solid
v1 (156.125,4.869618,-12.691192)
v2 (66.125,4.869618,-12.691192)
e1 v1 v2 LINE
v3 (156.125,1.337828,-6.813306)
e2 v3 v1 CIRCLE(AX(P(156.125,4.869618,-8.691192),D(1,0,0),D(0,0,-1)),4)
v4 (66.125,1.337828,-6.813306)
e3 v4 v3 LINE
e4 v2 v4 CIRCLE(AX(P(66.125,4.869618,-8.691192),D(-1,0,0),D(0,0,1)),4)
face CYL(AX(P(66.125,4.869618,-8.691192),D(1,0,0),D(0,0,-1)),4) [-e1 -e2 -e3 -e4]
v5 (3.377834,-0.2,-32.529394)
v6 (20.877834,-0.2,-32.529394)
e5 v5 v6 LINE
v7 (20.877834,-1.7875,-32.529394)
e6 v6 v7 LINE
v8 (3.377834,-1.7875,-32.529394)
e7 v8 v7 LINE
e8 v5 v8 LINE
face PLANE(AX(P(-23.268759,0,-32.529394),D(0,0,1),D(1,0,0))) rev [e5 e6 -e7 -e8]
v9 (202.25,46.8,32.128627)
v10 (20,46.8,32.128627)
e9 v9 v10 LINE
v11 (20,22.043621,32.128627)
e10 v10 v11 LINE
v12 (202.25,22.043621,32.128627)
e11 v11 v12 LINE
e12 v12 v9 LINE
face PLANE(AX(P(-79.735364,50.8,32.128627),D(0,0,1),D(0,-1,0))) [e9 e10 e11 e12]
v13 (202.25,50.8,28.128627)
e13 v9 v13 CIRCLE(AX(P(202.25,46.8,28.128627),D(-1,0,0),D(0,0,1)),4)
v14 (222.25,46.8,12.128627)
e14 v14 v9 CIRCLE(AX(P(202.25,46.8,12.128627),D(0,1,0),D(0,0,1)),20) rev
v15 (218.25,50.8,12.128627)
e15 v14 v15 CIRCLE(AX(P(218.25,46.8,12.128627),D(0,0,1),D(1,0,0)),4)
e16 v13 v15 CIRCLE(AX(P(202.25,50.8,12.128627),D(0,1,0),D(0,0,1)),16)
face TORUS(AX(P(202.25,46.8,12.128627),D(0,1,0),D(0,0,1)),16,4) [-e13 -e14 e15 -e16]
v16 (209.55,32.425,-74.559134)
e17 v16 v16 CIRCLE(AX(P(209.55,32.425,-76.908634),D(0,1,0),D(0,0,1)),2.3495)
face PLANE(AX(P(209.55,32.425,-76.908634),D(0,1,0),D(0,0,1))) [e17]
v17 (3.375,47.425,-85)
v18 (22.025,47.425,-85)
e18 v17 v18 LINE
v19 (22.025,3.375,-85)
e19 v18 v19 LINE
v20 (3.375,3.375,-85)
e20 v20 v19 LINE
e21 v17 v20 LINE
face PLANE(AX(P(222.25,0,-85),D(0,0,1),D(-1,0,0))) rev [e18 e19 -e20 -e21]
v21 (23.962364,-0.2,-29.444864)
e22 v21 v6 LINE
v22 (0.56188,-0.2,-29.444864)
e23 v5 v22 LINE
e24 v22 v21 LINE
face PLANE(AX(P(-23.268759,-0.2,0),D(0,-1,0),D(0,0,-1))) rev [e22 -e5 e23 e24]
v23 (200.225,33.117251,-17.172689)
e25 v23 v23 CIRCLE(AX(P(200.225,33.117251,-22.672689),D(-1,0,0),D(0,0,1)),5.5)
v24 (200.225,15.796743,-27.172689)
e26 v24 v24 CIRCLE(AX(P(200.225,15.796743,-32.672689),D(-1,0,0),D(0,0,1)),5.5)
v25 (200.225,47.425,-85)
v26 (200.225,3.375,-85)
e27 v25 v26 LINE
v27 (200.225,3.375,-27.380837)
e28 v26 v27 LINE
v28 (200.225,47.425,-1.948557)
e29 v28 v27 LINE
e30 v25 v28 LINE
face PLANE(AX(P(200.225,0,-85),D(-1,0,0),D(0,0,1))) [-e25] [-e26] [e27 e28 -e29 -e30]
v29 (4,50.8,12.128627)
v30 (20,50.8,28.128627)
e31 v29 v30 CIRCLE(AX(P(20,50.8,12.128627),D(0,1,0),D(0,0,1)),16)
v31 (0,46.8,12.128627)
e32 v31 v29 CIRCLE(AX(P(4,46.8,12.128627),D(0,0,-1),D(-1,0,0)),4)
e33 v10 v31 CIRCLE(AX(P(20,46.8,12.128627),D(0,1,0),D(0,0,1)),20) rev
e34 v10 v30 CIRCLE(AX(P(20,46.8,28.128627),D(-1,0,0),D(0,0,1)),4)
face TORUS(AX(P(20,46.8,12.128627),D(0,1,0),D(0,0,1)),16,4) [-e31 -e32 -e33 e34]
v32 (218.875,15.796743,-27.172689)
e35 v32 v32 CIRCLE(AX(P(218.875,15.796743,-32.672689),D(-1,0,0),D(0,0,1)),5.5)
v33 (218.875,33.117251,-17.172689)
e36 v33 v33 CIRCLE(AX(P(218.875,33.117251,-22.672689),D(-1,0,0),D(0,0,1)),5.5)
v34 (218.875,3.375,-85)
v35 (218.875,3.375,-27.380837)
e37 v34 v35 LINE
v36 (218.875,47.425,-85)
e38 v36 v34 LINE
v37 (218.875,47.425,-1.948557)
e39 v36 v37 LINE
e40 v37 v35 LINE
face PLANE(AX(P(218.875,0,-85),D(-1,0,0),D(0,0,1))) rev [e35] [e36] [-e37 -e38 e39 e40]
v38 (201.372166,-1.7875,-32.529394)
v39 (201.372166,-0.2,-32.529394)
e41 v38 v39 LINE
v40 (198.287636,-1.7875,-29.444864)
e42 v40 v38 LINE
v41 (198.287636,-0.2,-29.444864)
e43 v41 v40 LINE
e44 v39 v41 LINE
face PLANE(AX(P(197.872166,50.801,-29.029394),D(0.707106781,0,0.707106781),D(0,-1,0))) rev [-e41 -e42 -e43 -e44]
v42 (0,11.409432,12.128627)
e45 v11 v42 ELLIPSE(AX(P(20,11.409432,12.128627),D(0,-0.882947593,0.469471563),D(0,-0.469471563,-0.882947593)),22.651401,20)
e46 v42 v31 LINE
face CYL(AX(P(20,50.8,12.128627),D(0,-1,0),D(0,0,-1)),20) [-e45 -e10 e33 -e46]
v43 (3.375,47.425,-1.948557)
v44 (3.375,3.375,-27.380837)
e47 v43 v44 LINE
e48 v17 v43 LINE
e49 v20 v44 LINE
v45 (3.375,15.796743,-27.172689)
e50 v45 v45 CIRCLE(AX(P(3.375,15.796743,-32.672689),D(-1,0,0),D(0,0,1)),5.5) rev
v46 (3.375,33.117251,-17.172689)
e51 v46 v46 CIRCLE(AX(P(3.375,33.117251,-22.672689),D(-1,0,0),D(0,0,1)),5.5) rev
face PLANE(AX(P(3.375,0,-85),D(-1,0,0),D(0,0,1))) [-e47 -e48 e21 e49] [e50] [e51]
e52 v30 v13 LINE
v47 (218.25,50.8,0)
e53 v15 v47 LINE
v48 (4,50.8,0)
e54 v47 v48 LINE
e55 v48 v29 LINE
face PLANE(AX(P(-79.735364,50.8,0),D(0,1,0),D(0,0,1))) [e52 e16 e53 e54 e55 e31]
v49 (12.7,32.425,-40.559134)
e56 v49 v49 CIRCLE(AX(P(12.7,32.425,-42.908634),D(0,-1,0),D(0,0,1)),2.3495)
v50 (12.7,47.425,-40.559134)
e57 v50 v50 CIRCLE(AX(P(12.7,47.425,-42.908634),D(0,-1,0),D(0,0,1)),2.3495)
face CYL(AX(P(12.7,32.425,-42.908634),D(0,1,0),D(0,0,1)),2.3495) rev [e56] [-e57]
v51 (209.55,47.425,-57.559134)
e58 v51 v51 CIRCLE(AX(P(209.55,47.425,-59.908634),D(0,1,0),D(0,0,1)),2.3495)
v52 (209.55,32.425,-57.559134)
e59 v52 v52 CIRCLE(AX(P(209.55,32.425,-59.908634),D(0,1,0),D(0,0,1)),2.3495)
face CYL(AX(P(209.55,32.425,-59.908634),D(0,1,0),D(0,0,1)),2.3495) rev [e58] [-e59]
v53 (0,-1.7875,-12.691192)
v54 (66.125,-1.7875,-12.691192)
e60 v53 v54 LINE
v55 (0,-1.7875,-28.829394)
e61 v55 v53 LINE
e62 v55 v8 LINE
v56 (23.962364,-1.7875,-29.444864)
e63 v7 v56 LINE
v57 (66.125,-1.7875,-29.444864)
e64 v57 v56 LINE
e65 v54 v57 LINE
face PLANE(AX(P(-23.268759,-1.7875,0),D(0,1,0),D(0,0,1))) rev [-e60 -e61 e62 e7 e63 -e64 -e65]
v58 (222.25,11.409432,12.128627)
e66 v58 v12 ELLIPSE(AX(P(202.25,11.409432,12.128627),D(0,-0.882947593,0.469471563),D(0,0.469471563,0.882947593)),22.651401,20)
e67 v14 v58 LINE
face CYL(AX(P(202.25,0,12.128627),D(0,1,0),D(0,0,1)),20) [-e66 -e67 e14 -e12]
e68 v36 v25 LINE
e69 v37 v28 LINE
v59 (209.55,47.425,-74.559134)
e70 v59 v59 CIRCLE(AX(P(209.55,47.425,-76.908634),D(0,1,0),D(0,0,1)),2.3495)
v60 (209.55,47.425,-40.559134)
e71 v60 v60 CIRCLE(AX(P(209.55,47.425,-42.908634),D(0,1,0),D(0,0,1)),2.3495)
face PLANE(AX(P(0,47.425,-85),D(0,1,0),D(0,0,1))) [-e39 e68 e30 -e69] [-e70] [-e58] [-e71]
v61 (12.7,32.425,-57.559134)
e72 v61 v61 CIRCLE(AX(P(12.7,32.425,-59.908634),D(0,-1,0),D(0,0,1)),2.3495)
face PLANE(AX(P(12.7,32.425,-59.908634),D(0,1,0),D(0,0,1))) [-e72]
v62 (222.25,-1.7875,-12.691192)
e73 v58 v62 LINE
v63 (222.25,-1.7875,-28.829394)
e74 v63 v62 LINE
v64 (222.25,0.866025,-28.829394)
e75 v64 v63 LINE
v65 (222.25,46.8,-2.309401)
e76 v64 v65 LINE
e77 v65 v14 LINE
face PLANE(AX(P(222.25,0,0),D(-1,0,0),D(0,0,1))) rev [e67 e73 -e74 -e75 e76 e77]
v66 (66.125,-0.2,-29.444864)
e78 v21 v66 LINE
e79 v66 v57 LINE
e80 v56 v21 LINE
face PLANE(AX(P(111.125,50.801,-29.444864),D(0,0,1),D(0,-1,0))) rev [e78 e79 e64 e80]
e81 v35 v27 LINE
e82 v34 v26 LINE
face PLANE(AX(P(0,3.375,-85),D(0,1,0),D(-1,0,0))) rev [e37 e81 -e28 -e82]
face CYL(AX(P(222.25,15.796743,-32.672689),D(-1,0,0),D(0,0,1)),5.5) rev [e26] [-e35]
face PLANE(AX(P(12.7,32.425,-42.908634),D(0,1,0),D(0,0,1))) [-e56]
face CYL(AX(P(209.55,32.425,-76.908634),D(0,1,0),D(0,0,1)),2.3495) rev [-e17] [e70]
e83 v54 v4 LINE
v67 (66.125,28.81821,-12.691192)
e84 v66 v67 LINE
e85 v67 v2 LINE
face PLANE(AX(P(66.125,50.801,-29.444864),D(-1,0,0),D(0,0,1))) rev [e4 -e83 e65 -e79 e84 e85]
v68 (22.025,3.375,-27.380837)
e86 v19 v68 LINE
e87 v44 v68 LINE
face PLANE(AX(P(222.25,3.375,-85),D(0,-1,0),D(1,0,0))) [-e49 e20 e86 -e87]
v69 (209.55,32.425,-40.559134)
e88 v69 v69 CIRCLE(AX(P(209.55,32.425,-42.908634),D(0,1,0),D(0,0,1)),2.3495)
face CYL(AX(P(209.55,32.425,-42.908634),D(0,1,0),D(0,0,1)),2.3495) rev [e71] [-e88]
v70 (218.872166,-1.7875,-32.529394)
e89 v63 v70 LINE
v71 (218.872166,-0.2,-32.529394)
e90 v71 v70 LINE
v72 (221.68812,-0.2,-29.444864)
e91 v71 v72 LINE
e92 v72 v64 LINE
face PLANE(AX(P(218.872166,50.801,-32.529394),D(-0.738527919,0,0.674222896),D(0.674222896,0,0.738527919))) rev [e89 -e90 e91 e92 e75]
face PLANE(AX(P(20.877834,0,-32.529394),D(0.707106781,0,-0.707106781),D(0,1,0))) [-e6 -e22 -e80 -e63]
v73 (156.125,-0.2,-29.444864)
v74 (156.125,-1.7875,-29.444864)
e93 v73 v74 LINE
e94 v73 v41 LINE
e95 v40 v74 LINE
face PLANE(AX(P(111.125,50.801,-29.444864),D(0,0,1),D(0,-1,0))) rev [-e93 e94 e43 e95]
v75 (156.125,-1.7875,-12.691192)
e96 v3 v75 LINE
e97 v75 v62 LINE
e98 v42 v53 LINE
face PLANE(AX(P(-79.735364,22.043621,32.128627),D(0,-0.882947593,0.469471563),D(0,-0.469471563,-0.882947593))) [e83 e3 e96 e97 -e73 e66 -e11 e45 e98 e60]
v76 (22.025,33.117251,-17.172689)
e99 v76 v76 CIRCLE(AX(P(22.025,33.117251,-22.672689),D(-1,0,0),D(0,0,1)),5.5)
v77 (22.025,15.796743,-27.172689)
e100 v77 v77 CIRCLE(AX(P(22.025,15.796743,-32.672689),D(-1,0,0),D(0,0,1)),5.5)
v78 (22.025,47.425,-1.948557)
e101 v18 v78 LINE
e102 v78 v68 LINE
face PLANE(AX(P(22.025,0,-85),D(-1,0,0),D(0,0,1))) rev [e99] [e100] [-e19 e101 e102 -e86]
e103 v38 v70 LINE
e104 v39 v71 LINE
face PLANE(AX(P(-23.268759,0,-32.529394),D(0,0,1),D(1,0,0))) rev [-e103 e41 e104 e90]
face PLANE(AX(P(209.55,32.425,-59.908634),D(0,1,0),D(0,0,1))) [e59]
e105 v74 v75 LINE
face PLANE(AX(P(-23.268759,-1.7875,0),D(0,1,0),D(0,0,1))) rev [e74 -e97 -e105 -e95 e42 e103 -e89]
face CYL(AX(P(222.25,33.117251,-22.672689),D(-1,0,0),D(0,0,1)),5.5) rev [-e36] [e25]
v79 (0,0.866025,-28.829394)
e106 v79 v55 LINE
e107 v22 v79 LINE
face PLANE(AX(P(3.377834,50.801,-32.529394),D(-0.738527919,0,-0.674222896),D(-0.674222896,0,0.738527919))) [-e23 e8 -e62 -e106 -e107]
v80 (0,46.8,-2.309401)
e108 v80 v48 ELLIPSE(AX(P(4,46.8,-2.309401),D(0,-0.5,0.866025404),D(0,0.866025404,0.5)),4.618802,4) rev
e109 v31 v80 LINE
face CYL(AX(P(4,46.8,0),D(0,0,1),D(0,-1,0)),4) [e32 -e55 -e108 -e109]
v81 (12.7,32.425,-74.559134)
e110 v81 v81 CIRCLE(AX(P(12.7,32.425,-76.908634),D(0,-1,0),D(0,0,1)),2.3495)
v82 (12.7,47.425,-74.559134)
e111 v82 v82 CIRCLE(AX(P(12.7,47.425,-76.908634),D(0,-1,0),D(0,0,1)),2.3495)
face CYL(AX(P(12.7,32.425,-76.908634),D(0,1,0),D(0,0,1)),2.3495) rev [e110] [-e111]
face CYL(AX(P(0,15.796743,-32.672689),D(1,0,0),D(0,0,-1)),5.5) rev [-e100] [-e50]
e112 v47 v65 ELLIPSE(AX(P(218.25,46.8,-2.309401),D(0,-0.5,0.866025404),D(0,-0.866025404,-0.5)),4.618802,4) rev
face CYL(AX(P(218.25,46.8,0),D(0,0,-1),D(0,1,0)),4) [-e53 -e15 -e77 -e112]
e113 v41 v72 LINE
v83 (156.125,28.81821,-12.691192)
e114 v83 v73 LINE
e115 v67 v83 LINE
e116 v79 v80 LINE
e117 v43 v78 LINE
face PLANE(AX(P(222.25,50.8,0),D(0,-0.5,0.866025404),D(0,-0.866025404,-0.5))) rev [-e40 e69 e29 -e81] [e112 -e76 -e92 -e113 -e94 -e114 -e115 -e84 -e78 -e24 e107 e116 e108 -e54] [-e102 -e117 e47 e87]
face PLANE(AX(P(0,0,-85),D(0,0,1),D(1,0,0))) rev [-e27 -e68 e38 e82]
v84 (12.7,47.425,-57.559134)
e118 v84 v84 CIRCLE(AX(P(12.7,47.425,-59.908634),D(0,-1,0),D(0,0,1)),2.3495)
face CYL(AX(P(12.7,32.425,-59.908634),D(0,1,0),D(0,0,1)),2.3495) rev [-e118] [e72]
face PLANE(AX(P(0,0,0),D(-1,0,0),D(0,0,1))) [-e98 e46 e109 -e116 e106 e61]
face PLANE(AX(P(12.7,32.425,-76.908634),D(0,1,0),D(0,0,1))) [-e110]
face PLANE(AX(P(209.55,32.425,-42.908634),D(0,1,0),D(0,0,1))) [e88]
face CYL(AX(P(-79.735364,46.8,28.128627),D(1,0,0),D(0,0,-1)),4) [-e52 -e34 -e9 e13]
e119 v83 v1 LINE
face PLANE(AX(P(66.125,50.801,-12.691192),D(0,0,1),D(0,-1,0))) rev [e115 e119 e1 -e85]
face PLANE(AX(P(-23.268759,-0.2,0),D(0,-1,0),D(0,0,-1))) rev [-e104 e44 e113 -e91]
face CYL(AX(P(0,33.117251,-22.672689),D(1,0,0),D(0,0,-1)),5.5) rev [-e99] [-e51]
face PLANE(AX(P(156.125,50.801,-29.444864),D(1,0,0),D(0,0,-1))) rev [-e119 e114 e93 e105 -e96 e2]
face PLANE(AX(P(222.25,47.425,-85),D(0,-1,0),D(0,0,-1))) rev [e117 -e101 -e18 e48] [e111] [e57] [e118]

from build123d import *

# Parameters (mm, degrees)
BOSS_EXTRUDE1_DEPTH = 222.25
BOSS_EXTRUDE3_DEPTH = 85
SKETCH15_R          = 2.349500000000014
CUT_EXTRUDE6_DEPTH  = 15
SKETCH16_R          = 5.499999999999996
SKETCH16_R_2        = 5.499999999999989
CUT_EXTRUDE7_DEPTH  = 224.37343312265227
BOSS_EXTRUDE5_DEPTH = 222.25
CUT_EXTRUDE3_DEPTH  = 222.25
BOSS_EXTRUDE6_DEPTH = 222.25
CUT_EXTRUDE4_REACH  = 245.691
SKETCH10_W          = 86.747166
SKETCH10_H          = 3.084529946162071
CHAMFER1_SIZE       = 3.5
CUT_EXTRUDE5_REACH  = 245.691
FILLET1_R           = 4
FILLET2_R           = 20
FILLET3_R           = 4


with BuildPart() as part:
    # Sketch1 → Boss-Extrude1 (new body)
    with BuildSketch(Plane(origin=(0, 0, 0), x_dir=(0, 0, -1), z_dir=(1, 0, 0))):
        Polygon((0, 0), (0, 50.8), (29.32939367483333, 0), align=None)
    extrude(amount=BOSS_EXTRUDE1_DEPTH)

    # Sketch3 → Boss-Extrude3 (add)
    with BuildSketch(Plane.XY):
        Polygon((218.875, 47.425), (200.22500000000002, 47.425), (200.22500000000002, 3.374999999999998), (218.875, 3.375), align=None)
    boss_extrude3 = extrude(amount=-BOSS_EXTRUDE3_DEPTH)

    # Sketch15 → Cut-Extrude6 (cut)
    with BuildSketch(Plane(origin=(0, 47.425, 0), x_dir=(1, 0, 0), z_dir=(0, 1, 0))):
        with Locations(Location((209.55000000000064, 59.90863352220276, 0), (0, 0, 270))):
            Circle(SKETCH15_R)
        with Locations(Location((209.55000000000064, 42.90863352220276, 0), (0, 0, 270))):
            Circle(SKETCH15_R)
        with Locations(Location((209.55000000000064, 76.90863352220276, 0), (0, 0, 270))):
            Circle(SKETCH15_R)
    cut_extrude6 = extrude(amount=-CUT_EXTRUDE6_DEPTH, mode=Mode.SUBTRACT)

    # Sketch16 → Cut-Extrude7 (cut, through all)
    with BuildSketch(Plane.ZY.offset(-200.22500000000002)):
        with Locations((-22.67268904895815, 33.11725062299641)):
            Circle(SKETCH16_R)
        with Locations((-32.67268904895816, 15.796742547307629)):
            Circle(SKETCH16_R_2)
    cut_extrude7 = extrude(amount=-CUT_EXTRUDE7_DEPTH, mode=Mode.SUBTRACT)

    # Mirror1: Boss-Extrude3, Cut-Extrude6, Cut-Extrude7 across plane
    add(boss_extrude3.mirror(Plane.ZY.offset(-111.125)))
    add(cut_extrude6.mirror(Plane.ZY.offset(-111.125)), mode=Mode.SUBTRACT)
    add(cut_extrude7.mirror(Plane.ZY.offset(-111.125)), mode=Mode.SUBTRACT)

    # Sketch7 → Boss-Extrude5 (add)
    with BuildSketch(Plane(origin=(222.25, 0, 0), x_dir=(0, 0, -1), z_dir=(1, 0, 0))):
        Polygon((0, 50.8), (-32.128627, 50.79999999999999), (-32.128626999999994, 22.043620610825506), (9.32939367483333, 0), (29.32939367483333, 0), align=None)
    extrude(amount=-BOSS_EXTRUDE5_DEPTH)

    # Sketch8 → Cut-Extrude3 (cut)
    with BuildSketch(Plane(origin=(222.25, 0, 0), x_dir=(0, 0, -1), z_dir=(1, 0, 0))):
        Polygon((0, 4.960526608591835), (9.32939367483333, 0), (0, 0), align=None)
    extrude(amount=-CUT_EXTRUDE3_DEPTH, mode=Mode.SUBTRACT)

    # Sketch9 → Boss-Extrude6 (add)
    with BuildSketch(Plane(origin=(222.25, 0, 0), x_dir=(0, 0, -1), z_dir=(1, 0, 0))):
        Polygon((32.52939367483333, -1.7875), (12.691192231639896, -1.7875000000000023), (9.32939367483333, 0), (29.32939367483333, 0), (29.44486372867126, -0.2000000000000005), (32.52939367483333, -0.2), align=None)
    extrude(amount=-BOSS_EXTRUDE6_DEPTH)

    # Sketch10 → Cut-Extrude4 (cut, up to next)
    with BuildSketch(Plane.XZ.offset(1.7875000000000039), mode=Mode.PRIVATE) as cut_extrude4_sk1:
        Polygon((218.872166, -32.52939367483333), (222.25, -28.82939367483333), (222.25, -32.52939367483333), align=None)
    cut_extrude4_tool1 = extrude(cut_extrude4_sk1.sketch, amount=-CUT_EXTRUDE4_REACH, mode=Mode.PRIVATE) & part.part
    # Sketch10 → Cut-Extrude4 (cut, up to next)
    with BuildSketch(Plane.XZ.offset(1.7875000000000039), mode=Mode.PRIVATE) as cut_extrude4_sk2:
        with Locations((154.49858300000002, -30.987128701752294)):
            Rectangle(SKETCH10_W, SKETCH10_H)
    cut_extrude4_tool2 = extrude(cut_extrude4_sk2.sketch, amount=-CUT_EXTRUDE4_REACH, mode=Mode.PRIVATE) & part.part
    cut_extrude4_1 = cut_extrude4_tool1.solids().sort_by_distance((221.124055, -1.7875, -31.29606))[0]
    add(cut_extrude4_1, mode=Mode.SUBTRACT)
    cut_extrude4_2 = cut_extrude4_tool2.solids().sort_by_distance((154.498583, -1.7875, -30.987129))[0]
    add(cut_extrude4_2, mode=Mode.SUBTRACT)
    cut_extrude4 = cut_extrude4_1 + cut_extrude4_2  # Cut-Extrude4 as one shape, for the pattern or mirror that repeats it

    # Mirror2: Cut-Extrude4 across plane
    add(cut_extrude4.mirror(Plane.ZY.offset(-111.125)), mode=Mode.SUBTRACT)

    # Chamfer1
    # the kernel refuses this chamfer: 3.5 mm, written as the material it takes off along each edge
    with BuildSketch(Plane(origin=(24.37783399999998, -10.788390457880682, -32.52939367483333), x_dir=(-0.9996219169112968, 0, -0.027495876610586126), z_dir=(0, 1, 1.7e-16))) as chamfer1_piece_1_section:
        Polygon((CHAMFER1_SIZE * 0.999621916911, CHAMFER1_SIZE * 0.0274958766106), (-CHAMFER1_SIZE * 0.0274958766106, CHAMFER1_SIZE * 0.999621916911), (0, 0), align=None)
    chamfer1_piece_1 = extrude(amount=10.588390457880683, mode=Mode.PRIVATE)
    chamfer1_piece_1 = split(chamfer1_piece_1, bisect_by=Plane(origin=(23.984976555626393, -1.314391432651377, -29.444863728671262), z_dir=(0, 1.7e-16, -1)), keep=Keep.TOP, mode=Mode.PRIVATE)
    add(chamfer1_piece_1, mode=Mode.SUBTRACT)
    with BuildSketch(Plane(origin=(197.87216600000002, -10.788390457880718, -32.52939367483333), x_dir=(-0.02749587661059007, 0, 0.9996219169112966), z_dir=(0, 1, 1.7e-16))) as chamfer1_piece_2_section:
        Polygon((CHAMFER1_SIZE * 0.999621916911, CHAMFER1_SIZE * 0.0274958766106), (-CHAMFER1_SIZE * 0.0274958766106, CHAMFER1_SIZE * 0.999621916911), (0, 0), align=None)
    chamfer1_piece_2 = extrude(amount=10.588390457880719, mode=Mode.PRIVATE)
    chamfer1_piece_2 = split(chamfer1_piece_2, bisect_by=Plane(origin=(198.26502344437364, -1.3143914326513721, -29.444863728671262), z_dir=(0, 1.7e-16, -1)), keep=Keep.TOP, mode=Mode.PRIVATE)
    add(chamfer1_piece_2, mode=Mode.SUBTRACT)

    # Cut-Extrude5: up to this plane
    cut_extrude5_end = Plane(origin=(222.25, 50.8, 0), z_dir=(0, -0.5000000000000044, 0.8660254037844362))
    # Sketch11 → Cut-Extrude5 (cut, up to the surface)
    with BuildSketch(Plane.XZ.offset(1.7875000000000039), mode=Mode.PRIVATE) as cut_extrude5_sk1:
        Polygon((66.12499999999999, -29.444863728671255), (156.125, -29.444863728671255), (156.125, -12.691192231639896), (66.12500000000001, -12.691192231639896), align=None)
    cut_extrude5_tool1 = split(extrude(cut_extrude5_sk1.sketch, amount=-CUT_EXTRUDE5_REACH, mode=Mode.PRIVATE), bisect_by=cut_extrude5_end, keep=Keep.BOTH, mode=Mode.PRIVATE)
    add(cut_extrude5_tool1.solids().sort_by_distance((111.125, -1.7875, -21.068028))[0], mode=Mode.SUBTRACT)

    # Fillet1
    fillet1_edges = [part.edges().sort_by_distance(p)[0] for p in [
        (111.125, -1.7875000000000016, -12.691192231639896),
    ]]
    fillet(fillet1_edges, radius=FILLET1_R)

    # Fillet2
    fillet2_edges = [part.edges().sort_by_distance(p)[0] for p in [
        (222.25, 36.42181030541275, 32.128627),
        (0, 36.42181030541275, 32.128627),
    ]]
    fillet(fillet2_edges, radius=FILLET2_R)

    # Fillet3
    fillet3_edges = [part.edges().sort_by_distance(p)[0] for p in [
        (222.25, 50.8, 6.064313500000003),
        (0, 50.8, 6.0643135000000035),
        (111.125, 50.79999999999999, 32.128627),
        (216.39213562373095, 50.8, 26.270762623730953),
        (5.857864376269047, 50.8, 26.27076262373096),
    ]]
    fillet(fillet3_edges, radius=FILLET3_R)


solid = part.part
